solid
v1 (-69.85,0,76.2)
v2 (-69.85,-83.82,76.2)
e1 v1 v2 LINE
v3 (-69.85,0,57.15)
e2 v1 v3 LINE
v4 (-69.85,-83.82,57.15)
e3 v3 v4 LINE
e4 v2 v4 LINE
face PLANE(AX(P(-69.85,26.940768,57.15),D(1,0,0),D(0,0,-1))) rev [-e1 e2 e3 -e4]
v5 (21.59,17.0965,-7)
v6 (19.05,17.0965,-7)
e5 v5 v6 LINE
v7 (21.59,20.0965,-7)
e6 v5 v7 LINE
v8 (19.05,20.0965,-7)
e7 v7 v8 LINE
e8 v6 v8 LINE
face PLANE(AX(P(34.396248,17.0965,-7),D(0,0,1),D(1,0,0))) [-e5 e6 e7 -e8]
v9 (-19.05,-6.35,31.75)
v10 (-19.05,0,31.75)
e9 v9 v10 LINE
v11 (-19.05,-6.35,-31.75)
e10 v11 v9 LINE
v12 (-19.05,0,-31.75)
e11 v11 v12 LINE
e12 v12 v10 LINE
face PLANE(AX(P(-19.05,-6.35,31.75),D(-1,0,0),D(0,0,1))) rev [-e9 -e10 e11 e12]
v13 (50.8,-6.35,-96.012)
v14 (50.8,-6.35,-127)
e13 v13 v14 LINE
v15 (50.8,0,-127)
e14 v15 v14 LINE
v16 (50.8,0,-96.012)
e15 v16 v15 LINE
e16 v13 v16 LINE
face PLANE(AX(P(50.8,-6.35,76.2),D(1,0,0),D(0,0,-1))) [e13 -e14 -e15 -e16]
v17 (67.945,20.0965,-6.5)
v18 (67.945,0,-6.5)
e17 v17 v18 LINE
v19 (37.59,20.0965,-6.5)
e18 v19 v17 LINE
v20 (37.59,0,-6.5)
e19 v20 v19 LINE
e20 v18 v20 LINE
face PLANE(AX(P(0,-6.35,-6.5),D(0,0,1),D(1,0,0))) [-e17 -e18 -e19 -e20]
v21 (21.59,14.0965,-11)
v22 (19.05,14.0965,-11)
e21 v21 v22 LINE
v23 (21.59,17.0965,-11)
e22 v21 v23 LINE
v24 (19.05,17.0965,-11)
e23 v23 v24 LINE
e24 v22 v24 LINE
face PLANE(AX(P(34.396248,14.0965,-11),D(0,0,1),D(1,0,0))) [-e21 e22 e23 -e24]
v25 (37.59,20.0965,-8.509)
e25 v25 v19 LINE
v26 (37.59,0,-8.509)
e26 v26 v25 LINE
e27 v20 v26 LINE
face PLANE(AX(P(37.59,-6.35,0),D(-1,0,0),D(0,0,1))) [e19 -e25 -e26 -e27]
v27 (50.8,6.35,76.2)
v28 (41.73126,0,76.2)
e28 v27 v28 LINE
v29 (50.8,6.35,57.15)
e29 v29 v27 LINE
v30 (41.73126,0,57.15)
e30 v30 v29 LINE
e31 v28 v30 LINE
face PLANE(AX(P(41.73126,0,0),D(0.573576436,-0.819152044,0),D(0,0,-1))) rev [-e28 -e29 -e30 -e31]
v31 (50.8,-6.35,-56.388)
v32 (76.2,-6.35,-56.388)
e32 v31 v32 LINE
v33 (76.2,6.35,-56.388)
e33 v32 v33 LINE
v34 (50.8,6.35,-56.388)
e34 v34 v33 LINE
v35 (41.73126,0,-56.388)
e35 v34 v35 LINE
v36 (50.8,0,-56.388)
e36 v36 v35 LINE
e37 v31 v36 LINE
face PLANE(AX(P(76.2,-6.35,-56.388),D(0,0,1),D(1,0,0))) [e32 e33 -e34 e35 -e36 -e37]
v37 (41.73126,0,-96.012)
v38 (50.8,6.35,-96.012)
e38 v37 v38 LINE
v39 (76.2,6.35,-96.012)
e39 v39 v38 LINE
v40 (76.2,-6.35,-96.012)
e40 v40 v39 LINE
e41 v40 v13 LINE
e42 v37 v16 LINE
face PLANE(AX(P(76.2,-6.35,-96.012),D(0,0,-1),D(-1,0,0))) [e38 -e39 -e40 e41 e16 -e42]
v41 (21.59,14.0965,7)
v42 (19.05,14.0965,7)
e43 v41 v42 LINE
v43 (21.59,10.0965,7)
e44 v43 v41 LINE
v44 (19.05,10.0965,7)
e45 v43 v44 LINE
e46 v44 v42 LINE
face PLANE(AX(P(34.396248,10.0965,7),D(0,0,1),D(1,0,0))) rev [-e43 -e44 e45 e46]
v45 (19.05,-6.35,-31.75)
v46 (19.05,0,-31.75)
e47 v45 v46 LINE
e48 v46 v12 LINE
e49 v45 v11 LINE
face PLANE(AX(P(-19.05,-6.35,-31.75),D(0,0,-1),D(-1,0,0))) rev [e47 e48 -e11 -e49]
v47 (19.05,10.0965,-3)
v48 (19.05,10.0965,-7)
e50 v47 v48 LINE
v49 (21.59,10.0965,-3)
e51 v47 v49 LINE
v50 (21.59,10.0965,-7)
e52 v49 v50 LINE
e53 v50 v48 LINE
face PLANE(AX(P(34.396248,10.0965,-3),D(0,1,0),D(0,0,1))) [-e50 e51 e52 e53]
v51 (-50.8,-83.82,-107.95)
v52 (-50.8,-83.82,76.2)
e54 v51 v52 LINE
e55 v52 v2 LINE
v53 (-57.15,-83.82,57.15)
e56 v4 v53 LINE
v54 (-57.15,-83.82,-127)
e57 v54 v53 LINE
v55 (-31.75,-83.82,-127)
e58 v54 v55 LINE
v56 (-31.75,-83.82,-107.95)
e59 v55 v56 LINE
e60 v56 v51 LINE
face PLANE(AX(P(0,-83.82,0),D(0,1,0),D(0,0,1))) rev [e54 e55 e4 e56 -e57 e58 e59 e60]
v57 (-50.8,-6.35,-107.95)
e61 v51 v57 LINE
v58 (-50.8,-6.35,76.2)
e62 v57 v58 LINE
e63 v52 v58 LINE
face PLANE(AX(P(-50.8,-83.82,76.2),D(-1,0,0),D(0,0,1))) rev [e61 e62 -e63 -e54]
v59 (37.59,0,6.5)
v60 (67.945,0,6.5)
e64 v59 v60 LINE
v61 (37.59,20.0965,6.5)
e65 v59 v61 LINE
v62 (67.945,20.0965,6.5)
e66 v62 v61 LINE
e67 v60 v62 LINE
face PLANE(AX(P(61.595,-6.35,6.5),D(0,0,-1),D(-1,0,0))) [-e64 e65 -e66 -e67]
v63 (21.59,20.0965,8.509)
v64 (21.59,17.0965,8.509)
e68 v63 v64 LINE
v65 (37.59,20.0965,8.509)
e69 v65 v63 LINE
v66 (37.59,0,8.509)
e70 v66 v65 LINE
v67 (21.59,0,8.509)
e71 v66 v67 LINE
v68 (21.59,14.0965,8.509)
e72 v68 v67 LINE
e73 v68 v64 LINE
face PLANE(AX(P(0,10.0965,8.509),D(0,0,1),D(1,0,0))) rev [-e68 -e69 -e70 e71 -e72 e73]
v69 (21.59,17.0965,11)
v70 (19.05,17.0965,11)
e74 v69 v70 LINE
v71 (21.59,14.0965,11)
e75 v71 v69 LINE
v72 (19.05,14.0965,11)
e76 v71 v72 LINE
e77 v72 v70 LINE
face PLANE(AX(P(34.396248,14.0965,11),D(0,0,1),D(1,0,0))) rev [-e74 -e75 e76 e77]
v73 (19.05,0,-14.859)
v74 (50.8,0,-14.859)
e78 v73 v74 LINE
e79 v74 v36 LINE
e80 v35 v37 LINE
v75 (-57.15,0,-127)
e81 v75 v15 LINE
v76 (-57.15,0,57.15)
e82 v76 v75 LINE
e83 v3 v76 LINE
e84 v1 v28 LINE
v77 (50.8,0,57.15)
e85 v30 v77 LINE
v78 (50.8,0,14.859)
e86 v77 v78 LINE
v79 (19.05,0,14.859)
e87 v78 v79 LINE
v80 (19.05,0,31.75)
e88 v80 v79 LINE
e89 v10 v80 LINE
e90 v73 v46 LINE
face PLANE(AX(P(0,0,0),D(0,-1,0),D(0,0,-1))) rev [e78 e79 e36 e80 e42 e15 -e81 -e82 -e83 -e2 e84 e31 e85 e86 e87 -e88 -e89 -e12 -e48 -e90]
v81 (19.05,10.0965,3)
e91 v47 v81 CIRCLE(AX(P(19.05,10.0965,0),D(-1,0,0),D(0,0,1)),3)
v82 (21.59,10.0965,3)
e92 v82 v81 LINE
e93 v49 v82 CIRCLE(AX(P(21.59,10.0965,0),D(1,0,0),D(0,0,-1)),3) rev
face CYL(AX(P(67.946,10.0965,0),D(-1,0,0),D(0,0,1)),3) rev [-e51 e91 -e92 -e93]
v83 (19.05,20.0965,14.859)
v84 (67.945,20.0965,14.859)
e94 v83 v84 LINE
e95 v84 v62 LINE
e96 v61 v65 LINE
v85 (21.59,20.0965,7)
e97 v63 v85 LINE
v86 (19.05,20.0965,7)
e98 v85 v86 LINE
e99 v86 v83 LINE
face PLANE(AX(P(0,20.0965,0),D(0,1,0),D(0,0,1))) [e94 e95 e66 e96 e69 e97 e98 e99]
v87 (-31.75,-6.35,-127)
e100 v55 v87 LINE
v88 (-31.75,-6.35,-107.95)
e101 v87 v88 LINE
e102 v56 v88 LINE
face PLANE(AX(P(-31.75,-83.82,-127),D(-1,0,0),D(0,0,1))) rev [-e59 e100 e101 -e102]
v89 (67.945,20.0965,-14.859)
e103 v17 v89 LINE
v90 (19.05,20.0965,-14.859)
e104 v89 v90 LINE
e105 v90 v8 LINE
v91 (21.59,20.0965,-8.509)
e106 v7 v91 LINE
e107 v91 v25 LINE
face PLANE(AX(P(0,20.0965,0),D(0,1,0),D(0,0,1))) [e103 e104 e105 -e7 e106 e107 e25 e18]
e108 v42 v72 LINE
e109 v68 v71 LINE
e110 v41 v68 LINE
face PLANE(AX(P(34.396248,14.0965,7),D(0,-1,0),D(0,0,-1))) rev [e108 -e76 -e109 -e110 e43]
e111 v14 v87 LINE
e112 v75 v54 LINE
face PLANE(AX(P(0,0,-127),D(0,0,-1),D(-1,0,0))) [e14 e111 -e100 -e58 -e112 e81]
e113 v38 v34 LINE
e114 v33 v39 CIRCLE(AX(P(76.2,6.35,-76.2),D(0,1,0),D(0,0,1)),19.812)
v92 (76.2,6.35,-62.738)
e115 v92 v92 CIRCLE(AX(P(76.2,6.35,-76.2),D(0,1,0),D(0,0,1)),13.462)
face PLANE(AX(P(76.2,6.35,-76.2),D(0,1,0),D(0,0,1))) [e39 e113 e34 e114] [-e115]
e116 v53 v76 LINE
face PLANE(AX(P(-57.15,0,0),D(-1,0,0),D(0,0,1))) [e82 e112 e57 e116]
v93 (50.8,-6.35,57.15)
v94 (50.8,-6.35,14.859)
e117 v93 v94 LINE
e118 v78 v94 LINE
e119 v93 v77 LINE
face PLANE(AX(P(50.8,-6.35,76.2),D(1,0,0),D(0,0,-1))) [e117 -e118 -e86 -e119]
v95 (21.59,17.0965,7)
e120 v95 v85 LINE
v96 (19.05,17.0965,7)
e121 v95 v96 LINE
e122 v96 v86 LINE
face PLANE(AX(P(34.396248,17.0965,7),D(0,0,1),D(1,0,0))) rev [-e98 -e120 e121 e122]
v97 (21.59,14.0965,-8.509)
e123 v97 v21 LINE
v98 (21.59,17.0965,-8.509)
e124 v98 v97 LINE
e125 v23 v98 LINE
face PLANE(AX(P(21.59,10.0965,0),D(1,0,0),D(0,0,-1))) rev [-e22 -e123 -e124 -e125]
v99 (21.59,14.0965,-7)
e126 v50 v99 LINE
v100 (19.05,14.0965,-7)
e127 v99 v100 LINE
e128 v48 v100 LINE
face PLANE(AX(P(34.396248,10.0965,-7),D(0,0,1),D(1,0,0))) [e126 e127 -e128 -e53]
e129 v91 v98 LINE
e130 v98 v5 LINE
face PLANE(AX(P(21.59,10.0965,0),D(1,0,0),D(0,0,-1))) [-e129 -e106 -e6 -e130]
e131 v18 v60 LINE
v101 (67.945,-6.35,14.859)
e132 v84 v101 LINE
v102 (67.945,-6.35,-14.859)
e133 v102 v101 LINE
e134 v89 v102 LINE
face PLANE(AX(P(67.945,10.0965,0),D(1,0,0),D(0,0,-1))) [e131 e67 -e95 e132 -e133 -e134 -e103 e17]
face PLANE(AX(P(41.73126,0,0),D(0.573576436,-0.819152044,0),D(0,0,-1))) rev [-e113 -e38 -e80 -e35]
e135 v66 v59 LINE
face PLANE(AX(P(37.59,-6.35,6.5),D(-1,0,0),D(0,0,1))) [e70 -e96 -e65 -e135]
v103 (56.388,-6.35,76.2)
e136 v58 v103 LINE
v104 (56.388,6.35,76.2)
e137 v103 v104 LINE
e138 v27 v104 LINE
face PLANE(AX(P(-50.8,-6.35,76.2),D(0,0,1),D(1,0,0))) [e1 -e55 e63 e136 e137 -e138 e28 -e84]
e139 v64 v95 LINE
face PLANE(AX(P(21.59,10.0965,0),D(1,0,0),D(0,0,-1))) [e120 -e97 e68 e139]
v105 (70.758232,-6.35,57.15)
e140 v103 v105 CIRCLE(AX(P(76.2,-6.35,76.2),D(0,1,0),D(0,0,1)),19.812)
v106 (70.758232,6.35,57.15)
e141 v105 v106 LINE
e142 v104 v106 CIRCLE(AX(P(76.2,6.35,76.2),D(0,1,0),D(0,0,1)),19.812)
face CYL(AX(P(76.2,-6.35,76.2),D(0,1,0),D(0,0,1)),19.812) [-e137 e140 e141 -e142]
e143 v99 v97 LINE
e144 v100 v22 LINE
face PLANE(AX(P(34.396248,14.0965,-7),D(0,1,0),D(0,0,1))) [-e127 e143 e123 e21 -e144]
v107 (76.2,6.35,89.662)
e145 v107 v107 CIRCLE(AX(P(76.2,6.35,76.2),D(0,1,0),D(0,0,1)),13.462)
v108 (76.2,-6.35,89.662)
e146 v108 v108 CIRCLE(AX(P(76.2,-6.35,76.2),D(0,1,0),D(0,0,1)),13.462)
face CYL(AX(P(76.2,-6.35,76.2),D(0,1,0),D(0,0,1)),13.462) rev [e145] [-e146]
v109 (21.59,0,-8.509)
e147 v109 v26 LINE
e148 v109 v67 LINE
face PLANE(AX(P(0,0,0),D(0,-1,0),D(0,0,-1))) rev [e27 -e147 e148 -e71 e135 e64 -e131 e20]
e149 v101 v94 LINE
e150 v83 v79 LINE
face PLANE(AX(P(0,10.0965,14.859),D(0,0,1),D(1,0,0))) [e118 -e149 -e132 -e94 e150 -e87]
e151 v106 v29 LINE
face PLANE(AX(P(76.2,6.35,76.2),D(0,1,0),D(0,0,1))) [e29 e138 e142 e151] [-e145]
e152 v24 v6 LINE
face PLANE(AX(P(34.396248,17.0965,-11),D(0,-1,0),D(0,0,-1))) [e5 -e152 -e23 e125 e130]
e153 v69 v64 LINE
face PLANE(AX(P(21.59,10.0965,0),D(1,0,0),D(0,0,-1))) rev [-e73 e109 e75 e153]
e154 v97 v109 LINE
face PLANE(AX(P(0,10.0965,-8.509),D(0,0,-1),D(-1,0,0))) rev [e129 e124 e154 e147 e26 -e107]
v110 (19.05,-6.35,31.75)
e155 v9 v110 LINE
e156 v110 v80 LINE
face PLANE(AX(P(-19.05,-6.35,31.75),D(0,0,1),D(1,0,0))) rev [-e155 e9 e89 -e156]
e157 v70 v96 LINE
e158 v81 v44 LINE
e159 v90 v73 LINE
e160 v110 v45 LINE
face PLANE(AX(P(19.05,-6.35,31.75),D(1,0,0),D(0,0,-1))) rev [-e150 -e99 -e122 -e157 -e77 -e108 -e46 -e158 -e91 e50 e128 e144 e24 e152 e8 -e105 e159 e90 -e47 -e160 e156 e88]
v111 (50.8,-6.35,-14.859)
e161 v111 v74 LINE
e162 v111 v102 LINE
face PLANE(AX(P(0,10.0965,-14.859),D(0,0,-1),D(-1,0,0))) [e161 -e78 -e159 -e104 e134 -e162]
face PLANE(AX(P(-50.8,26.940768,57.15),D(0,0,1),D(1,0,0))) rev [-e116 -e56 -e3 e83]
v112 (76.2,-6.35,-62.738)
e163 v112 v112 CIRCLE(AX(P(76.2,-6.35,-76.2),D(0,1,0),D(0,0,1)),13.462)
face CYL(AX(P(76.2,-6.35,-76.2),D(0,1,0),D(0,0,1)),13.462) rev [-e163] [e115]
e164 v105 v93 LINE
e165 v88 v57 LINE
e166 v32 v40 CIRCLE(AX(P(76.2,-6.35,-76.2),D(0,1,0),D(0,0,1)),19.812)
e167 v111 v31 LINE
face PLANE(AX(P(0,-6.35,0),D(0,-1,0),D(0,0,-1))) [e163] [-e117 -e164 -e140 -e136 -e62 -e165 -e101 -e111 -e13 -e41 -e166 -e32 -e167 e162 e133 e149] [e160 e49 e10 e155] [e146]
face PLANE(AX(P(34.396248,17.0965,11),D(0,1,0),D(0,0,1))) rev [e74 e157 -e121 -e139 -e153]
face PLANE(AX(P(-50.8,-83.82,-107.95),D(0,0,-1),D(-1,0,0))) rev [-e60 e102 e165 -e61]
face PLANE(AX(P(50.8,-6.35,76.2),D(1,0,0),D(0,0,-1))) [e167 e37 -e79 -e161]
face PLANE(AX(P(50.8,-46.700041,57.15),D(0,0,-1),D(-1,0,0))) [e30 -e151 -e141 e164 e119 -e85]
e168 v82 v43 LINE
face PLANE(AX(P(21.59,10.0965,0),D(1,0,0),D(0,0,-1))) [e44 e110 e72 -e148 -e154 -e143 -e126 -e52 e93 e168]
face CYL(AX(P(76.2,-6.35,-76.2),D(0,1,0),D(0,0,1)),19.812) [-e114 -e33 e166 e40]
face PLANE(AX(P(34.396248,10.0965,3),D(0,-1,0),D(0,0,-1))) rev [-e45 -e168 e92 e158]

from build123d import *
from OCP.BRepFilletAPI import BRepFilletAPI_MakeChamfer

# Parameters (mm, degrees)
SKETCH1_W                 = 101.6
SKETCH1_H                 = 152.4
BOSS_EXTRUDE1_DEPTH       = 6.35
SKETCH2_W                 = 38.1
SKETCH2_H                 = 63.5
CUT_EXTRUDE1_DEPTH        = 92.800885072
BOSS_EXTRUDE3_DEPTH       = 10.0965
BOSS_EXTRUDE3_DEPTH_BACK  = 6.35
CUT_EXTRUDE2_REACH        = 105.862
SKETCH6_R                 = 3
SKETCH7_W                 = 24.005
SKETCH7_H                 = 2.009
BOSS_EXTRUDE4_DEPTH       = 16.4465
BOSS_EXTRUDE5_REACH       = 129.401
SKETCH10_W                = 13
SKETCH10_H                = 6.35
CUT_EXTRUDE3_REACH        = 138.165
SKETCH11_W                = 13
SKETCH11_H                = 10.0965
BOSS_EXTRUDE6_DEPTH       = 10
CUT_EXTRUDE4_DEPTH        = 2.54
SKETCH14_W                = 101.6
SKETCH14_H                = 6.35
BOSS_EXTRUDE7_DEPTH       = 50.8
SKETCH15_W                = 19.05
SKETCH15_H                = 19.05
BOSS_EXTRUDE8_DEPTH       = 77.47
SKETCH16_W                = 19.05
SKETCH16_H                = 19.05
BOSS_EXTRUDE9_DEPTH       = 6.35
SKETCH17_W                = 184.15
SKETCH17_H                = 83.82
BOSS_EXTRUDE10_DEPTH      = 6.35
BOSS_EXTRUDE11_DEPTH      = 6.35
BOSS_EXTRUDE11_DEPTH_BACK = 6.35
SKETCH18_R                = 19.812
SKETCH18_R_2              = 13.462
SKETCH21_W                = 7.62
SKETCH21_H                = 39.624
BOSS_EXTRUDE13_DEPTH      = 12.7
CHAMFER1_SIZE             = 6.35
CHAMFER1_SIZE_2           = 9.068739843


with BuildPart() as part:
    # Sketch1 → Boss-Extrude1 (new body)
    with BuildSketch(Plane(origin=(0, 0, 0), x_dir=(1, 0, 0), z_dir=(0, 1, 0))):
        Rectangle(SKETCH1_W, SKETCH1_H)
    extrude(amount=-BOSS_EXTRUDE1_DEPTH)

    # Sketch2 → Cut-Extrude1 (cut, through all)
    with BuildSketch(Plane(origin=(0, 0, 0), x_dir=(1, 0, 0), z_dir=(0, 1, 0))):
        Rectangle(SKETCH2_W, SKETCH2_H)
    extrude(amount=-CUT_EXTRUDE1_DEPTH, mode=Mode.SUBTRACT)

    # Sketch4 → Boss-Extrude3 (add, two sides: drawn at the far end of the back side and taken through both)
    with BuildSketch(Plane(origin=(0, 0, 0), x_dir=(1, 0, 0), z_dir=(0, 1, 0)).offset(-BOSS_EXTRUDE3_DEPTH_BACK)):
        Polygon((61.595, -8.509), (50.8, -8.509), (50.8, -14.859), (67.945, -14.859), (67.945, 14.859), (50.8, 14.859), (50.8, 8.509), (61.595, 8.509), align=None)
        Polygon((50.8, -8.509), (21.59, -8.509), (21.59, 8.509), (50.8, 8.509), (50.8, 14.859), (19.05, 14.859), (19.05, -14.859), (50.8, -14.859), align=None)
    extrude(amount=BOSS_EXTRUDE3_DEPTH + BOSS_EXTRUDE3_DEPTH_BACK)

    # Sketch6 → Cut-Extrude2 (cut, up to next)
    with BuildSketch(Plane.ZY.offset(-19.05), mode=Mode.PRIVATE) as cut_extrude2_sk1:
        with Locations((0, 10.0965)):
            Circle(SKETCH6_R)
    cut_extrude2_tool1 = extrude(cut_extrude2_sk1.sketch, amount=-CUT_EXTRUDE2_REACH, mode=Mode.PRIVATE) & part.part
    add(cut_extrude2_tool1.solids().sort_by_distance((19.05, 10.0965, 0))[0], mode=Mode.SUBTRACT)

    # Sketch7 → Boss-Extrude4 (add, through all)
    with BuildSketch(Plane(origin=(0, 10.0965, 0), x_dir=(1, 0, 0), z_dir=(0, 1, 0))):
        with Locations((49.5925, 7.5045)):
            Rectangle(SKETCH7_W, SKETCH7_H)
        with Locations((49.5925, -7.5045)):
            Rectangle(SKETCH7_W, SKETCH7_H)
    extrude(amount=-BOSS_EXTRUDE4_DEPTH)

    # Sketch10 → Boss-Extrude5 (add, up to next)
    with BuildSketch(Plane(origin=(50.8, 0, 0), x_dir=(0, 0, -1), z_dir=(1, 0, 0)), mode=Mode.PRIVATE) as boss_extrude5_sk1:
        with Locations((0, -3.175)):
            Rectangle(SKETCH10_W, SKETCH10_H)
    boss_extrude5_tool1 = extrude(boss_extrude5_sk1.sketch, amount=BOSS_EXTRUDE5_REACH, mode=Mode.PRIVATE) - part.part
    add(boss_extrude5_tool1.solids().sort_by_distance((50.8, -3.175, 0))[0])

    # Sketch11 → Cut-Extrude3 (cut, up to next)
    with BuildSketch(Plane.ZY.offset(-61.595), mode=Mode.PRIVATE) as cut_extrude3_sk1:
        with Locations((0, 5.04825)):
            Rectangle(SKETCH11_W, SKETCH11_H)
    cut_extrude3_tool1 = extrude(cut_extrude3_sk1.sketch, amount=-CUT_EXTRUDE3_REACH, mode=Mode.PRIVATE) & part.part
    add(cut_extrude3_tool1.solids().sort_by_distance((61.595, 5.04825, 0))[0], mode=Mode.SUBTRACT)

    # Sketch12 → Boss-Extrude6 (add)
    with BuildSketch(Plane(origin=(0, 10.0965, 0), x_dir=(1, 0, 0), z_dir=(0, 1, 0))):
        Polygon((67.945, -14.859), (67.945, -6.5), (37.59, -6.5), (37.59, -8.509), (21.59, -8.509), (21.59, -3), (19.05, -3), (19.05, -14.859), align=None)
        Polygon((37.59, 6.5), (67.945, 6.5), (67.945, 14.859), (19.05, 14.859), (19.05, 3), (21.59, 3), (21.59, 8.509), (37.59, 8.509), align=None)
    extrude(amount=BOSS_EXTRUDE6_DEPTH)

    # Sketch13 → Cut-Extrude4 (cut)
    with BuildSketch(Plane.ZY.offset(-19.05)):
        Polygon((3, 10.0965), (7, 10.0965), (7, 14.0965), (11, 14.0965), (11, 17.0965), (7, 17.0965), (7, 20.0965), (3, 20.0965), align=None)
    cut_extrude4 = extrude(amount=-CUT_EXTRUDE4_DEPTH, mode=Mode.SUBTRACT)

    # Mirror1: Cut-Extrude4 across plane
    add(cut_extrude4.mirror(Plane.XY), mode=Mode.SUBTRACT)

    # Sketch14 → Boss-Extrude7 (add)
    with BuildSketch(Plane(origin=(0, 0, -76.2), x_dir=(-1, 0, 0), z_dir=(0, 0, -1))):
        with Locations((0, -3.175)):
            Rectangle(SKETCH14_W, SKETCH14_H)
    extrude(amount=BOSS_EXTRUDE7_DEPTH)

    # Sketch15 → Boss-Extrude8 (add)
    with BuildSketch(Plane.XZ.offset(6.35)):
        with Locations((-60.325, 66.675)):
            Rectangle(SKETCH15_W, SKETCH15_H)
        with Locations((-41.275, -117.475)):
            Rectangle(SKETCH15_W, SKETCH15_H)
    extrude(amount=BOSS_EXTRUDE8_DEPTH)


with BuildPart() as boss_extrude8_piece_1:
    # of the separate pieces the step leaves, piece 1, a body of its own (boss_extrude8_pieces)
    add(part.part.solids().sort_by_distance((-50.8, 0, 76.2))[0])



with BuildPart() as boss_extrude8_piece_2:
    # of the separate pieces the step leaves, piece 2, a body of its own (boss_extrude8_pieces)
    add(part.part.solids().sort_by_distance((-50.8, -83.82, 76.2))[0])


with BuildPart() as boss_extrude8_piece_1_1:
    add(boss_extrude8_piece_1.part)

    add(boss_extrude8_piece_2.part)  # Boss-Extrude9 merges Boss-Extrude8 piece 2
    # Sketch16 → Boss-Extrude9 (add)
    with BuildSketch(Plane(origin=(0, -6.35, 0), x_dir=(1, 0, 0), z_dir=(0, 1, 0))):
        with Locations((-60.325, -66.675)):
            Rectangle(SKETCH16_W, SKETCH16_H)
    extrude(amount=BOSS_EXTRUDE9_DEPTH)

    # Sketch17 → Boss-Extrude10 (add)
    with BuildSketch(Plane.ZY.offset(50.8)):
        with Locations((-34.925, -41.91)):
            Rectangle(SKETCH17_W, SKETCH17_H)
    extrude(amount=BOSS_EXTRUDE10_DEPTH)

    # Sketch18 → Boss-Extrude11 (add, two sides: drawn at the far end of the back side and taken through both)
    # profile 1 of 2: a face of its own
    with BuildSketch(Plane(origin=(0, 0, 0), x_dir=(1, 0, 0), z_dir=(0, 1, 0)).offset(-BOSS_EXTRUDE11_DEPTH_BACK)):
        with Locations(Location((76.2, -76.2, 0), (0, 0, 270))):
            Circle(SKETCH18_R)
        with Locations(Location((76.2, -76.2, 0), (0, 0, 270))):
            Circle(SKETCH18_R_2, mode=Mode.SUBTRACT)
    # profile 2 of 2: a face of its own
    with BuildSketch(Plane(origin=(0, 0, 0), x_dir=(1, 0, 0), z_dir=(0, 1, 0)).offset(-BOSS_EXTRUDE11_DEPTH_BACK)):
        with BuildLine():
            Line((76.2, 96.012), (50.8, 96.012))
            Line((50.8, 96.012), (50.8, 56.388))
            Line((50.8, 56.388), (76.2, 56.388))
            ThreePointArc((76.2, 56.388), (96.012, 76.2), (76.2, 96.012))
        make_face()
        with Locations(Location((76.2, 76.2, 0), (0, 0, 270))):
            Circle(SKETCH18_R_2, mode=Mode.SUBTRACT)
    extrude(amount=BOSS_EXTRUDE11_DEPTH + BOSS_EXTRUDE11_DEPTH_BACK)


with BuildPart() as boss_extrude11_piece_1:
    # of the separate pieces the step leaves, piece 1, a body of its own (boss_extrude11_pieces)
    add(boss_extrude8_piece_1_1.part.solids().sort_by_distance((-50.8, -6.35, 76.2))[0])



with BuildPart() as boss_extrude11_piece_2:
    # of the separate pieces the step leaves, piece 2, a body of its own (boss_extrude11_pieces)
    add(boss_extrude8_piece_1_1.part.solids().sort_by_distance((76.2, 0, 96.012))[0])


with BuildPart() as boss_extrude11_piece_1_1:
    add(boss_extrude11_piece_1.part)

    add(boss_extrude11_piece_2.part)  # Boss-Extrude13 merges Boss-Extrude11 piece 2
    # Sketch21 → Boss-Extrude13 (add)
    with BuildSketch(Plane(origin=(0, 6.35, 0), x_dir=(1, 0, 0), z_dir=(0, 1, 0))):
        with BuildLine():
            Line((56.388, -76.2), (50.8, -76.2))
            Line((50.8, -76.2), (50.8, -57.15))
            Line((50.8, -57.15), (70.758231537, -57.15))
            ThreePointArc((70.758231537, -57.15), (60.383431776, -64.268884645), (56.388, -76.2))
        make_face()
        with Locations((54.61, 76.2)):
            Rectangle(SKETCH21_W, SKETCH21_H)
    extrude(amount=-BOSS_EXTRUDE13_DEPTH)

    # Chamfer1
    chamfer1_edges_1 = [boss_extrude11_piece_1_1.edges().sort_by_distance(p)[0] for p in [
        (50.8, 0, 66.675),
    ]]
    chamfer1_side_1 = [boss_extrude11_piece_1_1.faces().sort_by_distance(p)[0] for p in [
        (50.8, 0.127, 66.675),
    ]]
    chamfer1_edges_2 = [boss_extrude11_piece_1_1.edges().sort_by_distance(p)[0] for p in [
        (50.8, 0, -76.2),
    ]]
    chamfer1_side_2 = [boss_extrude11_piece_1_1.faces().sort_by_distance(p)[0] for p in [
        (50.673, 0, -76.2),
    ]]
    chamfer1 = BRepFilletAPI_MakeChamfer(boss_extrude11_piece_1_1.part.solid().wrapped)
    for e in chamfer1_edges_1:
        chamfer1.Add(CHAMFER1_SIZE - 0.0001, CHAMFER1_SIZE_2 - 0.0001, e.wrapped, chamfer1_side_1[0].wrapped)
    for e in chamfer1_edges_2:
        chamfer1.Add(CHAMFER1_SIZE_2 - 0.0001, CHAMFER1_SIZE - 0.0001, e.wrapped, chamfer1_side_2[0].wrapped)
    add(Compound.cast(chamfer1.Shape()), mode=Mode.REPLACE)  # a hair under: the kernel refuses the full size


solid = boss_extrude11_piece_1_1.part
